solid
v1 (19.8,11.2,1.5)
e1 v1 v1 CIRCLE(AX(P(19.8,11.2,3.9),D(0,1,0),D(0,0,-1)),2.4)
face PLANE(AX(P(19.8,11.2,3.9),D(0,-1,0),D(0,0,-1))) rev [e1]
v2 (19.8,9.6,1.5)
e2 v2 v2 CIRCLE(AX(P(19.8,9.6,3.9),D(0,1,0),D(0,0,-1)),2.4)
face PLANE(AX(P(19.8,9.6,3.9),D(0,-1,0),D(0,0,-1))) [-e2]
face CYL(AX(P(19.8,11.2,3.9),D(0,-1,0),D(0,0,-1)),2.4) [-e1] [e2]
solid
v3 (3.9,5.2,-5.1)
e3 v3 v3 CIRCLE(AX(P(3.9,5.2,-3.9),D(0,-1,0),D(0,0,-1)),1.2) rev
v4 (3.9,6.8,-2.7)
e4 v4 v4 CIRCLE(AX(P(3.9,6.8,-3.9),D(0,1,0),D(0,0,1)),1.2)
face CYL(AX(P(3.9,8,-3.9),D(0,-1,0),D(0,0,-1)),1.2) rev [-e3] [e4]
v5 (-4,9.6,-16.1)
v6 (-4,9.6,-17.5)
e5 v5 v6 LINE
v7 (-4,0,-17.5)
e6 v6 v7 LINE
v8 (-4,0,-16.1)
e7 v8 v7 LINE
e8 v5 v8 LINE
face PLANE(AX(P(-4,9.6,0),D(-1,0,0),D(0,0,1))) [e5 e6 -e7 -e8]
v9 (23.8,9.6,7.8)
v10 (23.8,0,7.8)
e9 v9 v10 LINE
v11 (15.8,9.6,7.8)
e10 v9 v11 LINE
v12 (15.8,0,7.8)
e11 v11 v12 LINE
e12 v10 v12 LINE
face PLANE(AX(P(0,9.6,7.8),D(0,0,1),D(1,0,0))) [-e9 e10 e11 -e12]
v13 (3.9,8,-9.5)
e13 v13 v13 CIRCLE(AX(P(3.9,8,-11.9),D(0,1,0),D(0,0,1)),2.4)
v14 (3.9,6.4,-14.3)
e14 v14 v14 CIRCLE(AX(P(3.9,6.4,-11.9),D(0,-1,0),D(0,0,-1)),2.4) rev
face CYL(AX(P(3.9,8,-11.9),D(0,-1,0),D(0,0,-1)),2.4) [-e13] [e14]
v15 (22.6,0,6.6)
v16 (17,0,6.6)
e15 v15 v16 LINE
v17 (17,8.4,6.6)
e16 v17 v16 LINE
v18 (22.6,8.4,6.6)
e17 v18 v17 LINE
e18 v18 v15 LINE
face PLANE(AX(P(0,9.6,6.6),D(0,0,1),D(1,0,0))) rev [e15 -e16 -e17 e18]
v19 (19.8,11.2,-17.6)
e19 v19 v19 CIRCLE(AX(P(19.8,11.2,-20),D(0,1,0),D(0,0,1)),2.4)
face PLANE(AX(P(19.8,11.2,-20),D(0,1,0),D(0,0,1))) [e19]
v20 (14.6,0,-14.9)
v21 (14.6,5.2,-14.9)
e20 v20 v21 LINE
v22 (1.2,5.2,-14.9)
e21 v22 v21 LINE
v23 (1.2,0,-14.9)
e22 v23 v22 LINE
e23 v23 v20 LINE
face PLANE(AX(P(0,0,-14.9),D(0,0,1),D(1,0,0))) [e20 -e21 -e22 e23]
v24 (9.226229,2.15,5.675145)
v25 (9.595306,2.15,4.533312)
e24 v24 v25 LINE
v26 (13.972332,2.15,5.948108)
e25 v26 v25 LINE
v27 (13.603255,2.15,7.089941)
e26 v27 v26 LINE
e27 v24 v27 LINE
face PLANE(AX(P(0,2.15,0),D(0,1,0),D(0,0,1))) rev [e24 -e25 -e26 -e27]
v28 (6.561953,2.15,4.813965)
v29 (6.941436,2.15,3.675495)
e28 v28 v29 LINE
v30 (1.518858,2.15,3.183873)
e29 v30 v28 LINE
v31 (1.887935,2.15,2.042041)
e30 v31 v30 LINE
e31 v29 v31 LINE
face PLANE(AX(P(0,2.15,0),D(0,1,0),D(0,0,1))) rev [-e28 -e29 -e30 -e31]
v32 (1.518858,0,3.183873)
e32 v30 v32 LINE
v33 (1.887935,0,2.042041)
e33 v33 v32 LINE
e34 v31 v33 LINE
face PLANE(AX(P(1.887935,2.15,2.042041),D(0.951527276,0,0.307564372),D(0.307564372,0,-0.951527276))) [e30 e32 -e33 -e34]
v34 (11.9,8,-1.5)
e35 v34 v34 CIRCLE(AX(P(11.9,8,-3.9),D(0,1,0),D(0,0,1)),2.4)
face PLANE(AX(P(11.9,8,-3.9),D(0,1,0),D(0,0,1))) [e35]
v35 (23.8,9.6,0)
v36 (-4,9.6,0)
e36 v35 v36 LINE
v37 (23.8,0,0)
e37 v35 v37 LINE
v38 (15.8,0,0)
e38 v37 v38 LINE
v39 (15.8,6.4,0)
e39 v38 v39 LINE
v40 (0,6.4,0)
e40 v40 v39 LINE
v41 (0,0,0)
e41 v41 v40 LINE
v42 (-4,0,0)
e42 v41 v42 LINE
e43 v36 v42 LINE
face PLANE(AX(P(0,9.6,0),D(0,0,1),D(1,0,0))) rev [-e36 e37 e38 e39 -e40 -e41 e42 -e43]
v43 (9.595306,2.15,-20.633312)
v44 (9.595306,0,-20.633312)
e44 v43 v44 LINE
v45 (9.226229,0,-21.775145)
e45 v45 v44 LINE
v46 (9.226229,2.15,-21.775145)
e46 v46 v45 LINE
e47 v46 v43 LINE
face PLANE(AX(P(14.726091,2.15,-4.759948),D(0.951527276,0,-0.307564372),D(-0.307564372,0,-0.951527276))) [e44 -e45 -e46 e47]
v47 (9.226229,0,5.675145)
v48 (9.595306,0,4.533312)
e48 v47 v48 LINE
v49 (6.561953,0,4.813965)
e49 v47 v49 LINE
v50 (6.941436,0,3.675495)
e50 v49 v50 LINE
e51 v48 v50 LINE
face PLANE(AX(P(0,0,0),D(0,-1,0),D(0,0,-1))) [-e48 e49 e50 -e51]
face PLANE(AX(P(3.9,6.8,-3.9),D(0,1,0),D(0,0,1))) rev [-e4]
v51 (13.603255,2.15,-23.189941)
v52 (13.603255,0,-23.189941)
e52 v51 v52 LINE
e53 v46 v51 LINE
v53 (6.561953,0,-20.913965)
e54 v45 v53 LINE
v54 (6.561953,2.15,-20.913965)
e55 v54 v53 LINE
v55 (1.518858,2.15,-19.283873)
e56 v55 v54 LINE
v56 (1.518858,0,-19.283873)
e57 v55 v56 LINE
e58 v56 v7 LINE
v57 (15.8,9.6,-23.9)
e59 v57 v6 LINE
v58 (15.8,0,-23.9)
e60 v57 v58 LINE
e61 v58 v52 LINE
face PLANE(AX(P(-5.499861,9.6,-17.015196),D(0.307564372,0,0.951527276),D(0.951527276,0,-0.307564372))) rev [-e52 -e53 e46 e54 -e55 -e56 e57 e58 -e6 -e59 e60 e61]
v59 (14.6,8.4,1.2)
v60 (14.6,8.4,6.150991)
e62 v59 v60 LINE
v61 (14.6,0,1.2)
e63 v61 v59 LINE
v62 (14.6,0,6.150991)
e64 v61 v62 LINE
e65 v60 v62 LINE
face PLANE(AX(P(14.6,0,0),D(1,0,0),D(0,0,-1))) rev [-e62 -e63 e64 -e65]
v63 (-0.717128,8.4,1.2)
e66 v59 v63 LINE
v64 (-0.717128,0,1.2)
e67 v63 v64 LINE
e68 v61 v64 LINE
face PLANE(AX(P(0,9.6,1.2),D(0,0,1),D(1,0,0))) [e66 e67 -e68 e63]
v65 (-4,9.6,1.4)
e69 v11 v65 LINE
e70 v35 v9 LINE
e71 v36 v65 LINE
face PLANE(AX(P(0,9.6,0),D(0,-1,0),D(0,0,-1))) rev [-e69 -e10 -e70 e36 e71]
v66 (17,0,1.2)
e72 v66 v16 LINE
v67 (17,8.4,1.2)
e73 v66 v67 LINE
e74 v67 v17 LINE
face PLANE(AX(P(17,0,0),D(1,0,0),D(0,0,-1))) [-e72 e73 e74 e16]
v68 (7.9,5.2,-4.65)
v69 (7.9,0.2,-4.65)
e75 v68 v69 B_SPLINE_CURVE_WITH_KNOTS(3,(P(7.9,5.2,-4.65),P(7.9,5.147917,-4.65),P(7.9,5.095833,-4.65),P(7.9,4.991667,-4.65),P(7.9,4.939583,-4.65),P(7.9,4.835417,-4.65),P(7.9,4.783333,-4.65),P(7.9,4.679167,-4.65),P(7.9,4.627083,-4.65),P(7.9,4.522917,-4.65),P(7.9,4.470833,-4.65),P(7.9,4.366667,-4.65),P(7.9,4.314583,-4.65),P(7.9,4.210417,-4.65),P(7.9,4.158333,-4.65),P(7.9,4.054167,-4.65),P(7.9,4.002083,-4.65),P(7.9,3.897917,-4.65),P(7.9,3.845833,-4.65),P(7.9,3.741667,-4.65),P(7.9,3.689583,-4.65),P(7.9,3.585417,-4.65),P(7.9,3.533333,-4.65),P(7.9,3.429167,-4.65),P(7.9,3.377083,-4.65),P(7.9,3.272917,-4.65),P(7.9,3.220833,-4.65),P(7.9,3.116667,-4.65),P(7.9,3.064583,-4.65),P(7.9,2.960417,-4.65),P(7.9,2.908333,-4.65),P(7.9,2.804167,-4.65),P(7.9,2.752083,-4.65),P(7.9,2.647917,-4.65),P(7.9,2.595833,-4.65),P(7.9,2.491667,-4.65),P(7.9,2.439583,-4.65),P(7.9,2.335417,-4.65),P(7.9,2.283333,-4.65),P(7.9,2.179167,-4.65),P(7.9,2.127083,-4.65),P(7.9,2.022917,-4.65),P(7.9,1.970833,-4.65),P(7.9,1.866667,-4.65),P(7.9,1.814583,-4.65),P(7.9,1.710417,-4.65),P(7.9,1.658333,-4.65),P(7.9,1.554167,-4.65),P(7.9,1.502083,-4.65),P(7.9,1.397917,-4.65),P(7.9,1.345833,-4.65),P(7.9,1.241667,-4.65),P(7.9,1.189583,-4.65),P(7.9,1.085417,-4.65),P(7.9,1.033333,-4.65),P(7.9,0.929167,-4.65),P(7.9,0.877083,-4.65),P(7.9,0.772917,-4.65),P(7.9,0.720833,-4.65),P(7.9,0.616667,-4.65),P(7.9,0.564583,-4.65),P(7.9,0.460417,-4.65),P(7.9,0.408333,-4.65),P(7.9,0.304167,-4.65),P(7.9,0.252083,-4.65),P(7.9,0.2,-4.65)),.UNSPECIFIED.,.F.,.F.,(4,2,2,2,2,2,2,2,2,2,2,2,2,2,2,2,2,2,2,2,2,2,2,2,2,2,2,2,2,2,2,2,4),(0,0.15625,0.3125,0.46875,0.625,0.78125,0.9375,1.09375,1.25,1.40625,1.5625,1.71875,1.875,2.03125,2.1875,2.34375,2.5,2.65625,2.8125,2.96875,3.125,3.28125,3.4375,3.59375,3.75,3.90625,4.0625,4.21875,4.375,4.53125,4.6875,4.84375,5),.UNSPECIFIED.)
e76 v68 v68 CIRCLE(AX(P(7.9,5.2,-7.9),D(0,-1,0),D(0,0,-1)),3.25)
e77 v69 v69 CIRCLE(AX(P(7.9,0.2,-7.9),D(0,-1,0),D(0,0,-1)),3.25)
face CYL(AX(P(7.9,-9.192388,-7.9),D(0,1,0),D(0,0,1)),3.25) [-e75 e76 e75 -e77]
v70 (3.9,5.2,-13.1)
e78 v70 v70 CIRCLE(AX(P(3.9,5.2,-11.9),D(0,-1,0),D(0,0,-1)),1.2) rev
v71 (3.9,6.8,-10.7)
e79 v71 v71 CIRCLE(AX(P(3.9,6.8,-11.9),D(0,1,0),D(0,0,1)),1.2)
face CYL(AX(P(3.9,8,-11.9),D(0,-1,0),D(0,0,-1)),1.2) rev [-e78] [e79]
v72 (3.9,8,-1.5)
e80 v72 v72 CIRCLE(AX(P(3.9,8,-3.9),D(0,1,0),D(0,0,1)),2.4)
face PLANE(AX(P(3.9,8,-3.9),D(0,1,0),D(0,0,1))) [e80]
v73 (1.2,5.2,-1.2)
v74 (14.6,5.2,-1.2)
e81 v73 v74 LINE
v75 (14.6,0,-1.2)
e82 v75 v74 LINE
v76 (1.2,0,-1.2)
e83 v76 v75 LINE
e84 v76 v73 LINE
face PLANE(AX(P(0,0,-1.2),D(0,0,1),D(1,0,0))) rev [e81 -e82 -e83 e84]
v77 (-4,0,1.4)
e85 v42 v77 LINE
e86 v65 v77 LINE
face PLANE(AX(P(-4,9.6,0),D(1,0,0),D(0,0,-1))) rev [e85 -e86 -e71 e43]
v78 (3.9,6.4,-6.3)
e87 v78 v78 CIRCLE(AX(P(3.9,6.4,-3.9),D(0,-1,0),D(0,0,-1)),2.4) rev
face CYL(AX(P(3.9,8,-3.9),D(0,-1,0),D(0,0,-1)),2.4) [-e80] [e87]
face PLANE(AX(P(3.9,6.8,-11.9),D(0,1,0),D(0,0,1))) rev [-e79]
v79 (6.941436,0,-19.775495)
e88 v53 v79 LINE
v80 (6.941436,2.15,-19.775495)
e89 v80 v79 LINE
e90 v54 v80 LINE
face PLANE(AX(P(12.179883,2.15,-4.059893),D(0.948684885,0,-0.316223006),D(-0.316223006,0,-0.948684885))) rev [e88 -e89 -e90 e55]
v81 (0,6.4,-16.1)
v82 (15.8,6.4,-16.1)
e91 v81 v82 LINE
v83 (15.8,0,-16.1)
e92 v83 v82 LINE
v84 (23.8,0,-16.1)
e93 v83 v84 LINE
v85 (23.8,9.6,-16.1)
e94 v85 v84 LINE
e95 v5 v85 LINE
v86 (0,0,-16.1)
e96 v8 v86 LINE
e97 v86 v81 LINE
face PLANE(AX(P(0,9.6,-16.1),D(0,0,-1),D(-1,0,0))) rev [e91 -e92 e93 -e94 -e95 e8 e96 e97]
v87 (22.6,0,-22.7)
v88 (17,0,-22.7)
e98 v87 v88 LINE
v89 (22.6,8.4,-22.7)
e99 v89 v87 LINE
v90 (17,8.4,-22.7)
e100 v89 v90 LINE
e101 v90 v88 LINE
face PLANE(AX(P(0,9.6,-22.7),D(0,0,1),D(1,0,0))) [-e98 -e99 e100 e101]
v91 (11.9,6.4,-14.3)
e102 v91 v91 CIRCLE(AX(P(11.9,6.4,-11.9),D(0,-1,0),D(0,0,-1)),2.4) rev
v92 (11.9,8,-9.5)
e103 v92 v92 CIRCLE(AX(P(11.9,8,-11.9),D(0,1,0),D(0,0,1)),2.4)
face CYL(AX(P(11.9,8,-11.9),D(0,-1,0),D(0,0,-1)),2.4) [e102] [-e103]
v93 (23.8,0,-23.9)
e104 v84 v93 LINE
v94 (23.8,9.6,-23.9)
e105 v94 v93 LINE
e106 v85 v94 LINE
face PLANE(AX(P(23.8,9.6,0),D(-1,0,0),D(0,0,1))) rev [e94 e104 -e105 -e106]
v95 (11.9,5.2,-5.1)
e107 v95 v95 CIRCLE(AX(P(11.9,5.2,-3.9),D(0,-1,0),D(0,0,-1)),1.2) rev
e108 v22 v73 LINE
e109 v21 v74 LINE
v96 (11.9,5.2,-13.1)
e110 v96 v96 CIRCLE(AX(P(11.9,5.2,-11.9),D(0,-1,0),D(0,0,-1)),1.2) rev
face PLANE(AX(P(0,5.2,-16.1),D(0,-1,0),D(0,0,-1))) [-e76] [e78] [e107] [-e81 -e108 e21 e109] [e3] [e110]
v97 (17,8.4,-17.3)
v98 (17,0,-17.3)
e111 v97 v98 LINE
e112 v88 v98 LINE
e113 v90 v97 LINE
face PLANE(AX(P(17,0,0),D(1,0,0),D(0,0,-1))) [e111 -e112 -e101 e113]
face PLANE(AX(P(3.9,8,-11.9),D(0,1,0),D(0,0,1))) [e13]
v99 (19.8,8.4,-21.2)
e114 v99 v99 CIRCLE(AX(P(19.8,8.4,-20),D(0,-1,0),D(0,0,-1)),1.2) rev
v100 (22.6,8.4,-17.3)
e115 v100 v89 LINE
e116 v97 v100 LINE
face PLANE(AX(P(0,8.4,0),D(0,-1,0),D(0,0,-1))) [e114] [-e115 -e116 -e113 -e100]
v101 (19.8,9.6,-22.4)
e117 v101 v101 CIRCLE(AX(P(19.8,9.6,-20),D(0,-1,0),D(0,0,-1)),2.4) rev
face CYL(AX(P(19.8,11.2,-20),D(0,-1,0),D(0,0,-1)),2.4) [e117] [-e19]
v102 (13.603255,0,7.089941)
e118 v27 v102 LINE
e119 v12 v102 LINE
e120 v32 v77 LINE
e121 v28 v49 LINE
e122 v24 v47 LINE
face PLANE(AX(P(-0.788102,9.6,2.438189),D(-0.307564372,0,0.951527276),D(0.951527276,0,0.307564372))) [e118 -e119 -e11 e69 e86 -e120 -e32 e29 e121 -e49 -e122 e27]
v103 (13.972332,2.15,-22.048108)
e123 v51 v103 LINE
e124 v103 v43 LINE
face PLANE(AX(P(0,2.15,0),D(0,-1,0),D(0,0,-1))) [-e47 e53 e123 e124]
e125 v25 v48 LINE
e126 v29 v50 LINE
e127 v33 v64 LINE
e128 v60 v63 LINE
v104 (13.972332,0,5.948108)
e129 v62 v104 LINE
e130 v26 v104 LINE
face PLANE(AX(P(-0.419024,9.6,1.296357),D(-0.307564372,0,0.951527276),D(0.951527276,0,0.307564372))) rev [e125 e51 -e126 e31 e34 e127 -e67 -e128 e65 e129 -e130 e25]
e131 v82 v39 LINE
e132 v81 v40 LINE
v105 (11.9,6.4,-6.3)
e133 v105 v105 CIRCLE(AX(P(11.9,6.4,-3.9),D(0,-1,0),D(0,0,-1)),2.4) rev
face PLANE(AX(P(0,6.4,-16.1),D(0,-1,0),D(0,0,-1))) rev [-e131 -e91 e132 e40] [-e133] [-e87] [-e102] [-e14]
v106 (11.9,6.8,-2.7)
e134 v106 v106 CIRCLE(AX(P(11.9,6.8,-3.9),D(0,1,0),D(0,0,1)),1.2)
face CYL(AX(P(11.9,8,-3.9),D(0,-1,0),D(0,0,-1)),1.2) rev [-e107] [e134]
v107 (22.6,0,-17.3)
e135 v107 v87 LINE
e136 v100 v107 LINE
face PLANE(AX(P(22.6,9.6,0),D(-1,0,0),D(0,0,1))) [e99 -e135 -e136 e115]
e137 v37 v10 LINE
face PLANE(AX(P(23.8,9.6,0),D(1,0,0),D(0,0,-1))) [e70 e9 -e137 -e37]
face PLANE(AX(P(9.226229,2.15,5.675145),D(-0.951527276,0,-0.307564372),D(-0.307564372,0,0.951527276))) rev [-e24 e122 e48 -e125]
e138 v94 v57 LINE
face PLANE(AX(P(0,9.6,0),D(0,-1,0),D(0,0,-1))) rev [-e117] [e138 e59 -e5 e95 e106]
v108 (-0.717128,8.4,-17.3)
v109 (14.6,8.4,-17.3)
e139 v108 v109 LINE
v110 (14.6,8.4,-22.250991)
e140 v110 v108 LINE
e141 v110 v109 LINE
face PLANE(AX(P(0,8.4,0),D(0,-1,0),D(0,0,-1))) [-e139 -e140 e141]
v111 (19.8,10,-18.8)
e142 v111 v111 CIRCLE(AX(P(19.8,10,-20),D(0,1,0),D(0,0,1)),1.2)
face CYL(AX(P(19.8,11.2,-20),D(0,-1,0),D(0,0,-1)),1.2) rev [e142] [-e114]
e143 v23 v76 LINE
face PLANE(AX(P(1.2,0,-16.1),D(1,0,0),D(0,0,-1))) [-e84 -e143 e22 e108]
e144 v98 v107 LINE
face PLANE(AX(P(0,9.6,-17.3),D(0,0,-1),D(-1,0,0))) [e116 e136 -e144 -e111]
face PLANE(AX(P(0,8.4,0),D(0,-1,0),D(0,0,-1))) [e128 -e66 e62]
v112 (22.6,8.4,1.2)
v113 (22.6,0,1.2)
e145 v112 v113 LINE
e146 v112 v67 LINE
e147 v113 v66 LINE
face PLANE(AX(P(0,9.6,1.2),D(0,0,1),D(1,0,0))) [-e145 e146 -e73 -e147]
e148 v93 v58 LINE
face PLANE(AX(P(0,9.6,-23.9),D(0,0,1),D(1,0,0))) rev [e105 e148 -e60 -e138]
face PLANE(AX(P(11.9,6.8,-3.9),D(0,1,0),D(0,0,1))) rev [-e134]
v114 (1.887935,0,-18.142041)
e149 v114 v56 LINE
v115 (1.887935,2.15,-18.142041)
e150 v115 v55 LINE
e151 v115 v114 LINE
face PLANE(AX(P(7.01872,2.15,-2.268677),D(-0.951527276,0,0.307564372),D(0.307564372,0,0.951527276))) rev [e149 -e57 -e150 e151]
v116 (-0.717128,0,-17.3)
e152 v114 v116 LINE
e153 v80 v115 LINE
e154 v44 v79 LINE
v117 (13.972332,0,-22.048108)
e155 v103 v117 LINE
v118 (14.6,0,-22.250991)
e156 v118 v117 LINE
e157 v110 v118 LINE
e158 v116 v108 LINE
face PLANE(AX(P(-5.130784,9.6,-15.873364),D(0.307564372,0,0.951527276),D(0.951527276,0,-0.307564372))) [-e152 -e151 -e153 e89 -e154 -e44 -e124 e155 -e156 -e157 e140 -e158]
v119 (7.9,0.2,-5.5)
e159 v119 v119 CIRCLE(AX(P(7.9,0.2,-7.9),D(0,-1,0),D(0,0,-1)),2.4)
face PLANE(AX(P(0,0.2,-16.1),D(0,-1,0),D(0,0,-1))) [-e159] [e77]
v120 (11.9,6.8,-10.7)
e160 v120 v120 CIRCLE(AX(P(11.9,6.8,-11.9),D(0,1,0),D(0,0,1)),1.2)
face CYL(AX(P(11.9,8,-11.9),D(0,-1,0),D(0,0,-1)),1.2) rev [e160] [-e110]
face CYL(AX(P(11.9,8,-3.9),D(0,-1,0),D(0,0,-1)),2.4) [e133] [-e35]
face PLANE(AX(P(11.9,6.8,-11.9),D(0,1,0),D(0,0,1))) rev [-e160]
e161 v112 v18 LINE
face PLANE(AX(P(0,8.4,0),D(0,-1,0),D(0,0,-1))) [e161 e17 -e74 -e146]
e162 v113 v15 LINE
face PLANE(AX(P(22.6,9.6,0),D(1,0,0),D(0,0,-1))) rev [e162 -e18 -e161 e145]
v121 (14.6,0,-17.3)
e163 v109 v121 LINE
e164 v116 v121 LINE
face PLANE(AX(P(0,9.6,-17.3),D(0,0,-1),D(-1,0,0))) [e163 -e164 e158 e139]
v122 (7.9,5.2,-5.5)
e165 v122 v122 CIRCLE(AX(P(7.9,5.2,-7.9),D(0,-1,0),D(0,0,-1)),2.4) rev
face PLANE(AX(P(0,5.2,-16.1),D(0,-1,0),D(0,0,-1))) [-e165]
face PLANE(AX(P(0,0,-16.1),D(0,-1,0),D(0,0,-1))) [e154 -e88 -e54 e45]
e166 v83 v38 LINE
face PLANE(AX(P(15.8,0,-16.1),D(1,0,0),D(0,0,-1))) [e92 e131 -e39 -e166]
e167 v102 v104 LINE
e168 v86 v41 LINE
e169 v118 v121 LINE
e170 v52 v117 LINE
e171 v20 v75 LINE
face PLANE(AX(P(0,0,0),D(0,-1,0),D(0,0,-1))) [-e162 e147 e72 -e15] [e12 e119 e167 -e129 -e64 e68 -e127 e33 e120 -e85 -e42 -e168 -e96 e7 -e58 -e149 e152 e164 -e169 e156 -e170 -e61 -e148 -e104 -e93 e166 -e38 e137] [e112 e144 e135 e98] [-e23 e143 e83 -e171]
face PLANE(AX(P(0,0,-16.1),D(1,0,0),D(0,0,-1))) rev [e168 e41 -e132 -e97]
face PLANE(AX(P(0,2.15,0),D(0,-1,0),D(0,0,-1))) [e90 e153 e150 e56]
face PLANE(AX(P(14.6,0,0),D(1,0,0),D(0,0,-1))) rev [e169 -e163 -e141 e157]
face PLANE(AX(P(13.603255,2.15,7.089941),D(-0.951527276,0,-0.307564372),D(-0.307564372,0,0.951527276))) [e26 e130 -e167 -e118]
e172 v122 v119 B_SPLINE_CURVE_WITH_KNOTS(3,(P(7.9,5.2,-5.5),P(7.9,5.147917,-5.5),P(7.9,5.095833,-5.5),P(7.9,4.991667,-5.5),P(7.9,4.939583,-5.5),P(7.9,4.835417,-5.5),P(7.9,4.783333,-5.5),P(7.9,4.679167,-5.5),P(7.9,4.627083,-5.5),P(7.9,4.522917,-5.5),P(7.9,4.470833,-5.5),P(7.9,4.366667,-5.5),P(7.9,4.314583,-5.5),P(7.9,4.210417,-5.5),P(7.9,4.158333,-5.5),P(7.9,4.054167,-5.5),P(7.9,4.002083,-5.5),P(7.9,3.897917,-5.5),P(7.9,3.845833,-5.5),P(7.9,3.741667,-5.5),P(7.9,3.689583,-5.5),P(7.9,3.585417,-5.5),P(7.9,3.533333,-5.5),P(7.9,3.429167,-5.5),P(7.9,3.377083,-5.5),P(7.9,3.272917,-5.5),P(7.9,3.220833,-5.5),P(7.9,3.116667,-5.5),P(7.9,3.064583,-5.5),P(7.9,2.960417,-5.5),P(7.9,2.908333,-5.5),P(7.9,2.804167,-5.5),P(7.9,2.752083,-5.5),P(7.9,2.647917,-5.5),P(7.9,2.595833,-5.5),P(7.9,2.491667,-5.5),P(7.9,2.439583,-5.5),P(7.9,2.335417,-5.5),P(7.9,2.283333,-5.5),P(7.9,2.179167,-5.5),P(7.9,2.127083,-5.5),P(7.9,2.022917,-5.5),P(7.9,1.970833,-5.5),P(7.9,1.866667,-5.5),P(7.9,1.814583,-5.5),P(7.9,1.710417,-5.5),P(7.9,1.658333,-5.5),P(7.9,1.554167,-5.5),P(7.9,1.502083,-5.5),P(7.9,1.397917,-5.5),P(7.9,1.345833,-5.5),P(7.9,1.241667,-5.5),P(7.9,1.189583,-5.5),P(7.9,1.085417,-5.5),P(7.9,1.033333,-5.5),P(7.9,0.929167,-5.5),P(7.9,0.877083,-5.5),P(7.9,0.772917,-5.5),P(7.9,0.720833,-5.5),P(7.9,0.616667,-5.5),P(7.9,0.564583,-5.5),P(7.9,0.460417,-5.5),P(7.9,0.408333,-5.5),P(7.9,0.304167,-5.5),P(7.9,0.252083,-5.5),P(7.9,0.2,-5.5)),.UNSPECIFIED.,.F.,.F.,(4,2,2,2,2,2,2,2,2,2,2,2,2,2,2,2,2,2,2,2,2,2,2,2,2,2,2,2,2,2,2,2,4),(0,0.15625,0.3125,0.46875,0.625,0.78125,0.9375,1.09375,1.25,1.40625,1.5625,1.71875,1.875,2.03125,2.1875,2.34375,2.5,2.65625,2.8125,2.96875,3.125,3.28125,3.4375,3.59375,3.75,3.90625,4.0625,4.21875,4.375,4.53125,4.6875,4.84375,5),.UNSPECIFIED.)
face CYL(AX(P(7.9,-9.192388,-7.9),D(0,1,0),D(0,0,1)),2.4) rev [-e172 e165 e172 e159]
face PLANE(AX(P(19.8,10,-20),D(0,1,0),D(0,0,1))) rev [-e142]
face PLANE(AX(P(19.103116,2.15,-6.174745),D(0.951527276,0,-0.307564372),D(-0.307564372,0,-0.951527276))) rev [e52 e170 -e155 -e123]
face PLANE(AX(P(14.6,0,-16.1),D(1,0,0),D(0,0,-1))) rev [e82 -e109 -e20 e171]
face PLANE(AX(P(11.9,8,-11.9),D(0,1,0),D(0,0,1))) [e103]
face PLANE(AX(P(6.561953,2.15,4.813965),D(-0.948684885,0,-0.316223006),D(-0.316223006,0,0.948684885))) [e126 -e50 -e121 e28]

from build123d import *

# Parameters (mm, degrees)
SKETCH1_W             = 15.8
SKETCH1_H             = 6.4
BOSS_EXTRUDE1_DEPTH   = 16.1
SKETCH2_R             = 2.4
BOSS_EXTRUDE2_DEPTH   = 1.6
LPATTERN1_COUNT       = 3
LPATTERN1_PITCH       = 8
LPATTERN1_COUNT_DIR2  = 2
LPATTERN1_PITCH_DIR2  = 8
SHELL1_T              = -1.2
SKETCH3_R             = 3.25
SKETCH3_R_2           = 2.4
BOSS_EXTRUDE3_DEPTH   = 5
BOSS_EXTRUDE4_DEPTH   = 9.6
BOSS_EXTRUDE4_2_DEPTH = 9.6
SKETCH7_R             = 2.4
BOSS_EXTRUDE5_DEPTH   = 1.6
SPLIT1_OUTLINE_W      = 8
SPLIT1_OUTLINE_H      = 9.6
SPLIT1_DEPTH          = 7.8
SPLIT1_START          = 15.8
SPLIT1_2_OUTLINE_W    = 9.6
SPLIT1_2_OUTLINE_H    = 7.8
SPLIT1_2_DEPTH        = 8
SPLIT1_3_OUTLINE_W    = 8
SPLIT1_3_OUTLINE_H    = 7.8
SPLIT1_3_DEPTH        = 9.6
SPLIT1_START_2        = 9.6
SPLIT1_4_OUTLINE_R    = 2.4
SPLIT1_4_DEPTH        = 1.6
SPLIT1_5_OUTLINE_W    = 12.2
SPLIT1_5_OUTLINE_H    = 10
SPLIT1_5_DEPTH        = 8
SHELL2_T              = -1.2
SHELL3_T              = -1.2
SHELL4_T              = -1.2
SHELL5_T              = -1.2
CUT_EXTRUDE1_DEPTH    = 2.15


# Read off the part's stored shape, not the designer's step: Split1
with BuildPart() as part:
    # Sketch1 → Boss-Extrude1 (new body)
    with BuildSketch(Plane.XY):
        with Locations((7.9, 3.2)):
            Rectangle(SKETCH1_W, SKETCH1_H)
    extrude(amount=-BOSS_EXTRUDE1_DEPTH)

    # Sketch2 → Boss-Extrude2 (add)
    with BuildSketch(Plane(origin=(0, 6.4, 0), x_dir=(1, 0, 0), z_dir=(0, 1, 0))):
        with Locations(Location((3.9, 3.9, 0), (0, 0, 90))):
            Circle(SKETCH2_R)
    boss_extrude2 = extrude(amount=BOSS_EXTRUDE2_DEPTH)

    # LPattern1: Boss-Extrude2 3 × 2, 2 skipped
    with Locations(*[(i * LPATTERN1_PITCH, 0, -j * LPATTERN1_PITCH_DIR2) for i in range(LPATTERN1_COUNT) for j in range(LPATTERN1_COUNT_DIR2) if (i, j) not in ((0, 0), (2, 0), (2, 1))]):
        add(boss_extrude2)

    # Shell1
    shell1_openings = [part.faces().sort_by_distance(p)[0] for p in [
        (7.9, 0, -8.05),
    ]]
    offset(amount=SHELL1_T, openings=shell1_openings, kind=Kind.INTERSECTION)

    # Sketch3 → Boss-Extrude3 (add)
    with BuildSketch(Plane.XZ.offset(-5.2)):
        with Locations(Location((7.9, -7.9, 0), (0, 0, 90))):
            Circle(SKETCH3_R)
        with Locations(Location((7.9, -7.9, 0), (0, 0, 90))):
            Circle(SKETCH3_R_2, mode=Mode.SUBTRACT)
    extrude(amount=BOSS_EXTRUDE3_DEPTH)


with BuildPart() as body_2:
    # Sketch4 → Boss-Extrude4 (new body)
    with BuildSketch(Plane(origin=(0, 0, 0), x_dir=(-1, 0, 0), z_dir=(0, -1, 0))):
        Polygon((-15.8, 23.9), (4, 17.5), (4, 16.1), (0, 16.1), (-15.8, 16.1), (-23.8, 16.1), (-23.8, 23.9), align=None)
    extrude(amount=-BOSS_EXTRUDE4_DEPTH)

    # Sketch7 → Boss-Extrude5 (add)
    with BuildSketch(Plane(origin=(0, 9.6, 0), x_dir=(1, 0, 0), z_dir=(0, 1, 0))):
        with Locations(Location((19.8, 20, 0), (0, 0, 90))):
            Circle(SKETCH7_R)
        with Locations(Location((19.8, -3.9, 0), (0, 0, 90))):
            Circle(SKETCH7_R)
    extrude(amount=BOSS_EXTRUDE5_DEPTH)


with BuildPart() as body_3:
    # Sketch4 → Boss-Extrude4 2 (new body)
    with BuildSketch(Plane(origin=(0, 0, 0), x_dir=(-1, 0, 0), z_dir=(0, -1, 0))):
        Polygon((-23.8, -7.8), (-15.8, -7.8), (4, -1.4), (4, 0), (0, 0), (-15.8, 0), (-23.8, 0), align=None)
    extrude(amount=-BOSS_EXTRUDE4_2_DEPTH)

    # Split1 2 outline → Split1 2 (cut)
    with BuildSketch(Plane.YZ.offset(SPLIT1_START)):
        with Locations((4.8, 3.9)):
            Rectangle(SPLIT1_2_OUTLINE_W, SPLIT1_2_OUTLINE_H)
    extrude(amount=SPLIT1_2_DEPTH, mode=Mode.SUBTRACT)

    # Shell5
    shell5_openings = [body_3.faces().sort_by_distance(p)[0] for p in [
        (8.195652174, 0, 2.671014493),
    ]]
    offset(amount=SHELL5_T, openings=shell5_openings)


with BuildPart() as boss_extrude5_piece_1:
    # of the separate pieces the step leaves, piece 1, a body of its own (boss_extrude5_pieces)
    add(body_2.part.solids().sort_by_distance((15.8, 0, -23.9))[0])

    # Split1 5 outline → Split1 5 (cut)
    with BuildSketch(Plane.YZ.offset(SPLIT1_START)):
        with Locations((5.1, -20)):
            Rectangle(SPLIT1_5_OUTLINE_W, SPLIT1_5_OUTLINE_H)
    extrude(amount=SPLIT1_5_DEPTH, mode=Mode.SUBTRACT)

    # Shell3
    shell3_openings = [boss_extrude5_piece_1.faces().sort_by_distance(p)[0] for p in [
        (8.195652174, 0, -18.771014493),
    ]]
    offset(amount=SHELL3_T, openings=shell3_openings)


with BuildPart() as boss_extrude5_piece_2:
    # of the separate pieces the step leaves, piece 2, a body of its own (boss_extrude5_pieces)
    add(body_2.part.solids().sort_by_distance((19.8, 9.6, 1.5))[0])


with BuildPart() as body_5:
    # Split1 outline → Split1 (new body)
    with BuildSketch(Plane.XY):
        with Locations((19.8, 4.8)):
            Rectangle(SPLIT1_OUTLINE_W, SPLIT1_OUTLINE_H)
    extrude(amount=SPLIT1_DEPTH)

    # Shell4
    shell4_openings = [body_5.faces().sort_by_distance(p)[0] for p in [
        (19.8, 0, 3.9),
    ]]
    offset(amount=SHELL4_T, openings=shell4_openings, kind=Kind.INTERSECTION)


with BuildPart() as body_6:
    # Split1 3 outline → Split1 3 (new body)
    with BuildSketch(Plane(origin=(0, 0, 0), x_dir=(1, 0, 0), z_dir=(0, 1, 0))):
        with Locations((19.8, 20)):
            Rectangle(SPLIT1_3_OUTLINE_W, SPLIT1_3_OUTLINE_H)
    extrude(amount=SPLIT1_3_DEPTH)

    # Split1 4 outline → Split1 4 (add)
    with BuildSketch(Plane(origin=(0, 0, 0), x_dir=(1, 0, 0), z_dir=(0, 1, 0)).offset(SPLIT1_START_2)):
        with Locations((19.8, 20)):
            Circle(SPLIT1_4_OUTLINE_R)
    extrude(amount=SPLIT1_4_DEPTH)

    # Shell2
    shell2_openings = [body_6.faces().sort_by_distance(p)[0] for p in [
        (19.8, 0, -20),
    ]]
    offset(amount=SHELL2_T, openings=shell2_openings, kind=Kind.INTERSECTION)


with BuildPart() as part_1:
    add(part.part)

    # Combine1: union Boss-Extrude5 piece 1, body 6
    add(boss_extrude5_piece_1.part)
    add(body_6.part)


with BuildPart() as cut_extrude1_tool:
    # Sketch8 → Cut-Extrude1 (new body)
    with BuildSketch(Plane.XZ):
        Polygon((9.595306383, -20.63331204), (9.226229137, -21.775144772), (13.603254607, -23.189940883), (13.972331853, -22.048108152), align=None)
        Polygon((1.518858201, -19.283873358), (6.561952764, -20.91396453), (6.941436129, -19.775495393), (1.887935447, -18.142040627), align=None)
        Polygon((13.972331853, 5.948108152), (9.595306383, 4.53331204), (9.226229137, 5.675144772), (13.603254607, 7.089940883), align=None)
        Polygon((6.941436129, 3.675495393), (1.887935447, 2.042040627), (1.518858201, 3.183873358), (6.561952764, 4.81396453), align=None)
    extrude(amount=-CUT_EXTRUDE1_DEPTH)


with BuildPart() as part_2:
    add(part_1.part)

    # Cut-Extrude1: cut by cut_extrude1_tool
    add(cut_extrude1_tool.part, mode=Mode.SUBTRACT)


with BuildPart() as body_3_1:
    add(body_3.part)

    # Cut-Extrude1: cut by cut_extrude1_tool
    add(cut_extrude1_tool.part, mode=Mode.SUBTRACT)

    # Combine2: union body 5, part
    add(body_5.part)
    add(part_2.part)


solid = Compound([boss_extrude5_piece_2.part, body_3_1.part])
